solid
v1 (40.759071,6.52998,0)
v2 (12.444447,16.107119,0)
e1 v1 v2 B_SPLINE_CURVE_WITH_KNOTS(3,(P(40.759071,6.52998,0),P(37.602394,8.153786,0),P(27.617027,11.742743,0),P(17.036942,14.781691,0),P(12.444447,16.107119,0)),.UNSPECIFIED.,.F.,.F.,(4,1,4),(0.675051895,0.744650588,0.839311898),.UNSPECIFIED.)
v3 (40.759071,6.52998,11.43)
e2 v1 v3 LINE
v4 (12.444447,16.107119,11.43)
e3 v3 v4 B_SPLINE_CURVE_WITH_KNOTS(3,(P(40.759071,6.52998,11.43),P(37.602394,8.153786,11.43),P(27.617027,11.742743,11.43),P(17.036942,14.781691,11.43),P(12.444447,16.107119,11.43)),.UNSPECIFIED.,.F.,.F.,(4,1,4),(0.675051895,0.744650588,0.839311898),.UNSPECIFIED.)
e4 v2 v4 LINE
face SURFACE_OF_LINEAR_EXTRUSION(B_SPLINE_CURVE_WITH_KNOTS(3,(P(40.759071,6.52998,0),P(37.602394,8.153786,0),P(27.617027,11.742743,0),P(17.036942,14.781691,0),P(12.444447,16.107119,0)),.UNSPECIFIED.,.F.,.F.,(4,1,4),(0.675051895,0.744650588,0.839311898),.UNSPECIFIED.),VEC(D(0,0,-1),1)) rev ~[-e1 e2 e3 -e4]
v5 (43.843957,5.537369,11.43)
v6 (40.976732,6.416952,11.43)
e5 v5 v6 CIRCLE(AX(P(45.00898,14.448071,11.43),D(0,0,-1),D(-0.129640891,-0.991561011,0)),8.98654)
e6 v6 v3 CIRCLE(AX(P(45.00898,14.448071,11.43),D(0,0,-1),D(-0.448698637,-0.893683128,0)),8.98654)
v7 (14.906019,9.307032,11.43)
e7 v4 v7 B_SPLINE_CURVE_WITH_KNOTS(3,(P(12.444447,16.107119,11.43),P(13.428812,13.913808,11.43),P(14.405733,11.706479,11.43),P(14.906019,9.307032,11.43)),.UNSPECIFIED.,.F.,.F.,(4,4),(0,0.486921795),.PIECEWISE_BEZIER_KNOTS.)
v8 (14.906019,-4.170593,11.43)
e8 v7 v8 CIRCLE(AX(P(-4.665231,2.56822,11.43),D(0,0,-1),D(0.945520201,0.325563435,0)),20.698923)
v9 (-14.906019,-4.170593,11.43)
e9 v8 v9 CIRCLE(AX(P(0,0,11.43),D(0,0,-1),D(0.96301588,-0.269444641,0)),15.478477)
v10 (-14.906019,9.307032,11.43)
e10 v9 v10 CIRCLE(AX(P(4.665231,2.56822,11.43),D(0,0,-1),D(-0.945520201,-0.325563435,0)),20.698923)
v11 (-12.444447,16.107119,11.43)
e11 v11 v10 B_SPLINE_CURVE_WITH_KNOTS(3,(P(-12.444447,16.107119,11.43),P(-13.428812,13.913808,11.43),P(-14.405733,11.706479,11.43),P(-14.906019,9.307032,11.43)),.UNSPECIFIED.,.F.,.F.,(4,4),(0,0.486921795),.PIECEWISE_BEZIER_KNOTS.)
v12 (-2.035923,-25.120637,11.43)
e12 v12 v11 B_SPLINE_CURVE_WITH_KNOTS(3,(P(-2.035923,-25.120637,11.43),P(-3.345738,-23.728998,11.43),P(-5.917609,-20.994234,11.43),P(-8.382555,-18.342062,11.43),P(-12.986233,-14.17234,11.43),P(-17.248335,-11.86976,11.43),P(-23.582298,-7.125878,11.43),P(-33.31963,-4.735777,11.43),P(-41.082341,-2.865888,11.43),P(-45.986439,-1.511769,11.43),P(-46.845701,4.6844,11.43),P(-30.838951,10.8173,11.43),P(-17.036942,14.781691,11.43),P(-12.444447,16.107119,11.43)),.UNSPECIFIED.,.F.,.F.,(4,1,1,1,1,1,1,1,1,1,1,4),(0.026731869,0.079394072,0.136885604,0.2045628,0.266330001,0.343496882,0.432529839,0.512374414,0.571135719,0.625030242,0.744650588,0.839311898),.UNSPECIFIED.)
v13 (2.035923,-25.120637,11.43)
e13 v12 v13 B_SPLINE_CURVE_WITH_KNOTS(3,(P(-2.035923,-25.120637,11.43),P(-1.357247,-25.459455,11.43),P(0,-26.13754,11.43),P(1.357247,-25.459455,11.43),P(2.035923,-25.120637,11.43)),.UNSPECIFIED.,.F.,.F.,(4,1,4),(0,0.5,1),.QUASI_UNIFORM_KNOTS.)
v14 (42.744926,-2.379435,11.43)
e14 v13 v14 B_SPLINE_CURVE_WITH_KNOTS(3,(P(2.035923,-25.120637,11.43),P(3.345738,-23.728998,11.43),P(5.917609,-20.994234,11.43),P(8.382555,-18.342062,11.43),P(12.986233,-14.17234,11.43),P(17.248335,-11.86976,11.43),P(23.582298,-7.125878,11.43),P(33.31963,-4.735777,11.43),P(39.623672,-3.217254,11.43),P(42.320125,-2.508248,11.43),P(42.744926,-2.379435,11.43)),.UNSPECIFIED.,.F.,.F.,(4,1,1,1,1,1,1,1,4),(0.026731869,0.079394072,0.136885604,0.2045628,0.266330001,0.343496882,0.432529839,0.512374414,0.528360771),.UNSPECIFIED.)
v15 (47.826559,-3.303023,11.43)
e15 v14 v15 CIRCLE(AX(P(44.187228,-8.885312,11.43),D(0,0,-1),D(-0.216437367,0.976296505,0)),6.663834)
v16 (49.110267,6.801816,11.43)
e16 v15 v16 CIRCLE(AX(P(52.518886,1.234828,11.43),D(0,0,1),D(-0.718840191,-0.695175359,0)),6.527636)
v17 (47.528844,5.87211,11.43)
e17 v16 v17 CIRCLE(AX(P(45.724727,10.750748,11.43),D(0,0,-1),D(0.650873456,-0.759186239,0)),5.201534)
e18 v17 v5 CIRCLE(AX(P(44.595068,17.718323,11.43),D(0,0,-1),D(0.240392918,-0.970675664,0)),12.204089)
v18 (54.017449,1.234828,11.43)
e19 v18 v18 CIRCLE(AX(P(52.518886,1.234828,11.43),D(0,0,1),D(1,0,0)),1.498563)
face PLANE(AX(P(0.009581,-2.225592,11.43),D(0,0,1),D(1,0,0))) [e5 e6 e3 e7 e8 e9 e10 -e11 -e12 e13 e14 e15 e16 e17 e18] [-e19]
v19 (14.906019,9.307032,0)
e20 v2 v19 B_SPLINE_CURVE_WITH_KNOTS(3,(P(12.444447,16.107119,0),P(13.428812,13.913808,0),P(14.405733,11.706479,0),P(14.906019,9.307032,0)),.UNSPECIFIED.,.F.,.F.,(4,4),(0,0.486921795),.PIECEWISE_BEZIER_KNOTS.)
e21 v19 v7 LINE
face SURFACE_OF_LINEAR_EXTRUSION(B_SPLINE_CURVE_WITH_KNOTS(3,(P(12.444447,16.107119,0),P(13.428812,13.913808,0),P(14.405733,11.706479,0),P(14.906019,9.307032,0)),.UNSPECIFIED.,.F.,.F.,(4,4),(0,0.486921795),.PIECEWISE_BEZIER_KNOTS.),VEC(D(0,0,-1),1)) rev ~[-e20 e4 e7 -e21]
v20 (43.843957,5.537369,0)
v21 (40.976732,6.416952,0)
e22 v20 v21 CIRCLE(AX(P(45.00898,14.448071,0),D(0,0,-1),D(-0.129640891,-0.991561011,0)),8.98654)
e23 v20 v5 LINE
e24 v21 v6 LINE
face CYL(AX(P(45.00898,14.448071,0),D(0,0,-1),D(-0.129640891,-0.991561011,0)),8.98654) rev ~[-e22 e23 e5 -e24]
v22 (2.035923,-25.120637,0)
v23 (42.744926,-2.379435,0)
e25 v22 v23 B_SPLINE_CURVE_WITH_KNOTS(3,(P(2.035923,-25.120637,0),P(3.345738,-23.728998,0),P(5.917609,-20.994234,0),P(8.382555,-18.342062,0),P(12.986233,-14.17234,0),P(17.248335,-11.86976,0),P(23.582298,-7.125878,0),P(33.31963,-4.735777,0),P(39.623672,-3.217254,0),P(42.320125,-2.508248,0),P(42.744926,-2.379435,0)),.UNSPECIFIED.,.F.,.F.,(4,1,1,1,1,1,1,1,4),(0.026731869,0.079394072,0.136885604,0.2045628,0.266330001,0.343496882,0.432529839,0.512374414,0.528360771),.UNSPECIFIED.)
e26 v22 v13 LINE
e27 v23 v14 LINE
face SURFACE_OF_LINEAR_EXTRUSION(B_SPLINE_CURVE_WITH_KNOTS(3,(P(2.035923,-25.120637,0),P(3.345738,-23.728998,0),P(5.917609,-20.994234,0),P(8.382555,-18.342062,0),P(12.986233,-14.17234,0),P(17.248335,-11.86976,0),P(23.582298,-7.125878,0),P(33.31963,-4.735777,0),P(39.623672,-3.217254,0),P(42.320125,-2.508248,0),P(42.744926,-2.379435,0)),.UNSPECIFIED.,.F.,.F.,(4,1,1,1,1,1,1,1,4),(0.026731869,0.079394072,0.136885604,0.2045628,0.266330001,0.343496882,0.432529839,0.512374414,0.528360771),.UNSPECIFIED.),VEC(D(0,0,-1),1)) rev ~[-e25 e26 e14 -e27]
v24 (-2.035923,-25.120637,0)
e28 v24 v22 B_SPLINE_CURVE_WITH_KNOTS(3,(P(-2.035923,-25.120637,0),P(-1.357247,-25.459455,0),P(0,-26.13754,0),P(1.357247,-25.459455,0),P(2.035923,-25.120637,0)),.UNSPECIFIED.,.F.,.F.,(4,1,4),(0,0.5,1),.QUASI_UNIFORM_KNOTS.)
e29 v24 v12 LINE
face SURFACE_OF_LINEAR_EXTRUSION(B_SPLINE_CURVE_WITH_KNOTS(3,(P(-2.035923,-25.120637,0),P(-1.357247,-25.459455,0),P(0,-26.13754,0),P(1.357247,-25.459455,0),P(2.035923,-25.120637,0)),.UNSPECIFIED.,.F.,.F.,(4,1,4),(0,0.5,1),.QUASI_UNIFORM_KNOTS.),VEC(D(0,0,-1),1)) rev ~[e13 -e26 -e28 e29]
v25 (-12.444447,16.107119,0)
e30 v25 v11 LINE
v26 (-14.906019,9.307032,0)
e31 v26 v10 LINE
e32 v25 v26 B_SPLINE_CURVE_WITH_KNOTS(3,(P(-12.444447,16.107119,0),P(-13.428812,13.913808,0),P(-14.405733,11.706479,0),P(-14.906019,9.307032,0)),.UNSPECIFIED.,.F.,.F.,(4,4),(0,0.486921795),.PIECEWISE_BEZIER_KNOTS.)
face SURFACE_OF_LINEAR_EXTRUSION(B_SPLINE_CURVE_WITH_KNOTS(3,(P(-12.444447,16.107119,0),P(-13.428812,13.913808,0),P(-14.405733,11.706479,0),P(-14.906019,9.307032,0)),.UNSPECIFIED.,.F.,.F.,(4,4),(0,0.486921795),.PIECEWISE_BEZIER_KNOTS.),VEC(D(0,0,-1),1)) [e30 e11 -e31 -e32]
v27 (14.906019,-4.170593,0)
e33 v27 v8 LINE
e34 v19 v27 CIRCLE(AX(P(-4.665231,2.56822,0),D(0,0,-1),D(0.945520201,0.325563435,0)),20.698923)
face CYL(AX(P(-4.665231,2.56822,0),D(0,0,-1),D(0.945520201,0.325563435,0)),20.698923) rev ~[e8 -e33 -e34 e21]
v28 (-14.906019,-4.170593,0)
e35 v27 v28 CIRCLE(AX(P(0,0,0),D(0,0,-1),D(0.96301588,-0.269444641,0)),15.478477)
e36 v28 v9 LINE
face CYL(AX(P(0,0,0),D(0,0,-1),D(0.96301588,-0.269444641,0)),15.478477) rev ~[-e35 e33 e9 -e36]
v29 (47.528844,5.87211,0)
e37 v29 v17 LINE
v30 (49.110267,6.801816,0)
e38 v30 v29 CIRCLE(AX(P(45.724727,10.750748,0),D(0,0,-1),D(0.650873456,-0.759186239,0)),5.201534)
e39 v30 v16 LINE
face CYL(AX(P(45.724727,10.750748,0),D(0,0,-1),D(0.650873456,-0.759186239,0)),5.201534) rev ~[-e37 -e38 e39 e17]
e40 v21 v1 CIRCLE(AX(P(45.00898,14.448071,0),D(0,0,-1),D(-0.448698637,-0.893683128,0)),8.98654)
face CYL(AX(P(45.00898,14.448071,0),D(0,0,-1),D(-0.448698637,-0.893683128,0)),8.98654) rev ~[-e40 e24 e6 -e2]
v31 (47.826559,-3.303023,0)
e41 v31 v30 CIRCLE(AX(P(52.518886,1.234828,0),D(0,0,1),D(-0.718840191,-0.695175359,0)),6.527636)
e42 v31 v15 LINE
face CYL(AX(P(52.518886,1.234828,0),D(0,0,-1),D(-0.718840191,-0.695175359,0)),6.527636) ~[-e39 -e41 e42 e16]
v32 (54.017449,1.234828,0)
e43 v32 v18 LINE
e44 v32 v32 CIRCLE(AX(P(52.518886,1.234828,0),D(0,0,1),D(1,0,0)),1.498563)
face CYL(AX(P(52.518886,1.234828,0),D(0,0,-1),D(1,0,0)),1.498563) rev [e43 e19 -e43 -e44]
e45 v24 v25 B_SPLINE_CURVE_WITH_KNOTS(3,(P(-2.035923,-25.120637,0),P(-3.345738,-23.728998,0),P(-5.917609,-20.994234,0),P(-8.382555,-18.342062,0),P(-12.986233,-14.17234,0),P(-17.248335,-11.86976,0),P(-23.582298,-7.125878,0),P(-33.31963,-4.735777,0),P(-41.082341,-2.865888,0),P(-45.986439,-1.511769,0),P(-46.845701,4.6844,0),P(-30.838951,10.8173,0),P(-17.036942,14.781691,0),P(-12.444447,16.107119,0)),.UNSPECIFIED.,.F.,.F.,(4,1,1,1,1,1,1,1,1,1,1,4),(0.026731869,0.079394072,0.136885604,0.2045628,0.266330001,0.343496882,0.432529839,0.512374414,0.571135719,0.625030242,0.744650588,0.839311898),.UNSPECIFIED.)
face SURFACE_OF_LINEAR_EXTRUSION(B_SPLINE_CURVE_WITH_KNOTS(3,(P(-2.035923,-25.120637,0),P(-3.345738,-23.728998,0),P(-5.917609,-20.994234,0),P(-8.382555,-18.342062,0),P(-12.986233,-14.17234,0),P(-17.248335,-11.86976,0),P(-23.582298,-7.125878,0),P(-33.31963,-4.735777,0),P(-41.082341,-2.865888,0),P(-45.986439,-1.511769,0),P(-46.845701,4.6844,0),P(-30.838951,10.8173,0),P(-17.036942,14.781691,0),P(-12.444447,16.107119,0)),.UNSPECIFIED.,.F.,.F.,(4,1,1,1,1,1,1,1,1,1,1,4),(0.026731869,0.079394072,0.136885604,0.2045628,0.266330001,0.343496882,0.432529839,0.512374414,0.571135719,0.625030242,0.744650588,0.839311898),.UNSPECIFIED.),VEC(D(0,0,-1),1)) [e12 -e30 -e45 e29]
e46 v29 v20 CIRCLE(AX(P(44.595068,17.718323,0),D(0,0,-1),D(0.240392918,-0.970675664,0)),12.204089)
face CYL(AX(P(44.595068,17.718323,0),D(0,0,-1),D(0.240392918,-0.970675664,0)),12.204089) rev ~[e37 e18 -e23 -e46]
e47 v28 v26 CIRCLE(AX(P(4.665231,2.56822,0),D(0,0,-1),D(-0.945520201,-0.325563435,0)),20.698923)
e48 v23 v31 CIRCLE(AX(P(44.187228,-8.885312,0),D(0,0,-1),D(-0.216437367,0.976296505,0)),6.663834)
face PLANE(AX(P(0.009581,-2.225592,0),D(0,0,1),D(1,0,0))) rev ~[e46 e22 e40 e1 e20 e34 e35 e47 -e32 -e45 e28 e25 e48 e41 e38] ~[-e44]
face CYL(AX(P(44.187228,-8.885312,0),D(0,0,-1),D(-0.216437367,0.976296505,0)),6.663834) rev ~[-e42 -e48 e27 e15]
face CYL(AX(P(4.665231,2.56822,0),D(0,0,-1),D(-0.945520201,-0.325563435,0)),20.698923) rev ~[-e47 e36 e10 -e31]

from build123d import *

# Parameters (mm, degrees)
F0_R     = 1.4985630317
F1_DEPTH = 11.43


with BuildPart() as f1:
    # F0 (on Top) → F1 (new body)
    with BuildSketch(Plane.XY):
        with BuildLine():
            add(Edge.make_bspline(
                [(-2.0359231176, -25.1206368319), (-1.3572468606, -25.4594553442), (0, -26.1375400989), (1.3572468606, -25.4594553442), (2.0359231176, -25.1206368319)],
                knots=[0, 0, 0, 0, 0.5, 1, 1, 1, 1], degree=3))
            add(Edge.make_bspline(
                [(2.0359231176, -25.1206368319), (3.3457383083, -23.7289975008), (5.9176088554, -20.9942341783), (8.3825547389, -18.3420624619), (12.9862326993, -14.1723402798), (17.2483349718, -11.8697604881), (23.5822979488, -7.1258779534), (33.3196303031, -4.7357772117), (39.6236724826, -3.217253521), (42.3201246069, -2.5082482566), (42.7449258083, -2.3794347429)],
                knots=[0.0267318689, 0.0267318689, 0.0267318689, 0.0267318689, 0.0793940725, 0.1368856043, 0.2045627996, 0.2663300013, 0.3434968825, 0.4325298389, 0.5123744144, 0.5283607708, 0.5283607708, 0.5283607708, 0.5283607708], degree=3))
            add(Edge.make_bspline(
                [(42.7449258083, -2.3794347429), (43.8815731542, -2.0347663711), (46.045577935, -1.0853188279), (46.5822686786, 2.7847802254), (43.1373679174, 5.284193473), (40.9767322457, 6.4169524924)],
                knots=[0.5283607708, 0.5283607708, 0.5283607708, 0.5283607708, 0.5711357195, 0.6250302421, 0.6734394222, 0.6734394222, 0.6734394222, 0.6734394222], degree=3))
            ThreePointArc((40.9767322457, 6.4169524924), (40.8675160296, 6.4727238237), (40.7590710313, 6.5299803131))
            add(Edge.make_bspline(
                [(40.7590710313, 6.5299803131), (37.6023937497, 8.1537861369), (27.6170269646, 11.7427429089), (17.0369422947, 14.7816914556), (12.4444465447, 16.107118844)],
                knots=[0.6750518947, 0.6750518947, 0.6750518947, 0.6750518947, 0.7446505875, 0.8393118979, 0.8393118979, 0.8393118979, 0.8393118979], degree=3))
            add(Edge.make_bspline(
                [(12.4444465447, 16.107118844), (13.4288124201, 13.9138079535), (14.405733434, 11.706479395), (14.9060189724, 9.307032451)],
                knots=[0, 0, 0, 0, 0.4869217945, 0.4869217945, 0.4869217945, 0.4869217945], degree=3))
            ThreePointArc((14.9060189724, 9.307032451), (16.033692156, 2.5682199114), (14.9060189724, -4.1705926282))
            ThreePointArc((14.9060189724, -4.1705926282), (0, -15.4784768138), (-14.9060189724, -4.1705926282))
            ThreePointArc((-14.9060189724, -4.1705926282), (-16.033692156, 2.5682199114), (-14.9060189724, 9.307032451))
            add(Edge.make_bspline(
                [(-12.4444465447, 16.107118844), (-13.4288124201, 13.9138079535), (-14.405733434, 11.706479395), (-14.9060189724, 9.307032451)],
                knots=[0, 0, 0, 0, 0.4869217945, 0.4869217945, 0.4869217945, 0.4869217945], degree=3))
            add(Edge.make_bspline(
                [(-2.0359231176, -25.1206368319), (-3.3457383083, -23.7289975008), (-5.9176088554, -20.9942341783), (-8.3825547389, -18.3420624619), (-12.9862326993, -14.1723402798), (-17.2483349718, -11.8697604881), (-23.5822979488, -7.1258779534), (-33.3196303031, -4.7357772117), (-41.0823407103, -2.8658881275), (-45.9864394649, -1.5117687719), (-46.8457007748, 4.6843999202), (-30.8389514135, 10.8173001618), (-17.0369422947, 14.7816914556), (-12.4444465447, 16.107118844)],
                knots=[0.0267318689, 0.0267318689, 0.0267318689, 0.0267318689, 0.0793940725, 0.1368856043, 0.2045627996, 0.2663300013, 0.3434968825, 0.4325298389, 0.5123744144, 0.5711357195, 0.6250302421, 0.7446505875, 0.8393118979, 0.8393118979, 0.8393118979, 0.8393118979], degree=3))
        make_face()
        with BuildLine():
            add(Edge.make_bspline(
                [(42.7449258083, -2.3794347429), (43.8815731542, -2.0347663711), (46.045577935, -1.0853188279), (46.5822686786, 2.7847802254), (43.1373679174, 5.284193473), (40.9767322457, 6.4169524924)],
                knots=[0.5283607708, 0.5283607708, 0.5283607708, 0.5283607708, 0.5711357195, 0.6250302421, 0.6734394222, 0.6734394222, 0.6734394222, 0.6734394222], degree=3))
            ThreePointArc((42.7449258083, -2.3794347429), (45.378860283, -2.3288884868), (47.8265587579, -3.3030229318))
            ThreePointArc((47.8265587579, -3.3030229318), (58.9944758829, 0.412176161), (49.1102670664, 6.8018156877))
            ThreePointArc((49.1102670664, 6.8018156877), (48.3608651105, 6.266695872), (47.5288443445, 5.8721100719))
            ThreePointArc((47.5288443445, 5.8721100719), (45.6991604767, 5.5642789991), (43.843957286, 5.5373690255))
            ThreePointArc((43.843957286, 5.5373690255), (42.3733924319, 5.8567052695), (40.9767322457, 6.4169524924))
        make_face()
        with Locations((52.5188855827, 1.2348284946)):
            Circle(F0_R, mode=Mode.SUBTRACT)
    extrude(amount=F1_DEPTH)


solid = f1.part
